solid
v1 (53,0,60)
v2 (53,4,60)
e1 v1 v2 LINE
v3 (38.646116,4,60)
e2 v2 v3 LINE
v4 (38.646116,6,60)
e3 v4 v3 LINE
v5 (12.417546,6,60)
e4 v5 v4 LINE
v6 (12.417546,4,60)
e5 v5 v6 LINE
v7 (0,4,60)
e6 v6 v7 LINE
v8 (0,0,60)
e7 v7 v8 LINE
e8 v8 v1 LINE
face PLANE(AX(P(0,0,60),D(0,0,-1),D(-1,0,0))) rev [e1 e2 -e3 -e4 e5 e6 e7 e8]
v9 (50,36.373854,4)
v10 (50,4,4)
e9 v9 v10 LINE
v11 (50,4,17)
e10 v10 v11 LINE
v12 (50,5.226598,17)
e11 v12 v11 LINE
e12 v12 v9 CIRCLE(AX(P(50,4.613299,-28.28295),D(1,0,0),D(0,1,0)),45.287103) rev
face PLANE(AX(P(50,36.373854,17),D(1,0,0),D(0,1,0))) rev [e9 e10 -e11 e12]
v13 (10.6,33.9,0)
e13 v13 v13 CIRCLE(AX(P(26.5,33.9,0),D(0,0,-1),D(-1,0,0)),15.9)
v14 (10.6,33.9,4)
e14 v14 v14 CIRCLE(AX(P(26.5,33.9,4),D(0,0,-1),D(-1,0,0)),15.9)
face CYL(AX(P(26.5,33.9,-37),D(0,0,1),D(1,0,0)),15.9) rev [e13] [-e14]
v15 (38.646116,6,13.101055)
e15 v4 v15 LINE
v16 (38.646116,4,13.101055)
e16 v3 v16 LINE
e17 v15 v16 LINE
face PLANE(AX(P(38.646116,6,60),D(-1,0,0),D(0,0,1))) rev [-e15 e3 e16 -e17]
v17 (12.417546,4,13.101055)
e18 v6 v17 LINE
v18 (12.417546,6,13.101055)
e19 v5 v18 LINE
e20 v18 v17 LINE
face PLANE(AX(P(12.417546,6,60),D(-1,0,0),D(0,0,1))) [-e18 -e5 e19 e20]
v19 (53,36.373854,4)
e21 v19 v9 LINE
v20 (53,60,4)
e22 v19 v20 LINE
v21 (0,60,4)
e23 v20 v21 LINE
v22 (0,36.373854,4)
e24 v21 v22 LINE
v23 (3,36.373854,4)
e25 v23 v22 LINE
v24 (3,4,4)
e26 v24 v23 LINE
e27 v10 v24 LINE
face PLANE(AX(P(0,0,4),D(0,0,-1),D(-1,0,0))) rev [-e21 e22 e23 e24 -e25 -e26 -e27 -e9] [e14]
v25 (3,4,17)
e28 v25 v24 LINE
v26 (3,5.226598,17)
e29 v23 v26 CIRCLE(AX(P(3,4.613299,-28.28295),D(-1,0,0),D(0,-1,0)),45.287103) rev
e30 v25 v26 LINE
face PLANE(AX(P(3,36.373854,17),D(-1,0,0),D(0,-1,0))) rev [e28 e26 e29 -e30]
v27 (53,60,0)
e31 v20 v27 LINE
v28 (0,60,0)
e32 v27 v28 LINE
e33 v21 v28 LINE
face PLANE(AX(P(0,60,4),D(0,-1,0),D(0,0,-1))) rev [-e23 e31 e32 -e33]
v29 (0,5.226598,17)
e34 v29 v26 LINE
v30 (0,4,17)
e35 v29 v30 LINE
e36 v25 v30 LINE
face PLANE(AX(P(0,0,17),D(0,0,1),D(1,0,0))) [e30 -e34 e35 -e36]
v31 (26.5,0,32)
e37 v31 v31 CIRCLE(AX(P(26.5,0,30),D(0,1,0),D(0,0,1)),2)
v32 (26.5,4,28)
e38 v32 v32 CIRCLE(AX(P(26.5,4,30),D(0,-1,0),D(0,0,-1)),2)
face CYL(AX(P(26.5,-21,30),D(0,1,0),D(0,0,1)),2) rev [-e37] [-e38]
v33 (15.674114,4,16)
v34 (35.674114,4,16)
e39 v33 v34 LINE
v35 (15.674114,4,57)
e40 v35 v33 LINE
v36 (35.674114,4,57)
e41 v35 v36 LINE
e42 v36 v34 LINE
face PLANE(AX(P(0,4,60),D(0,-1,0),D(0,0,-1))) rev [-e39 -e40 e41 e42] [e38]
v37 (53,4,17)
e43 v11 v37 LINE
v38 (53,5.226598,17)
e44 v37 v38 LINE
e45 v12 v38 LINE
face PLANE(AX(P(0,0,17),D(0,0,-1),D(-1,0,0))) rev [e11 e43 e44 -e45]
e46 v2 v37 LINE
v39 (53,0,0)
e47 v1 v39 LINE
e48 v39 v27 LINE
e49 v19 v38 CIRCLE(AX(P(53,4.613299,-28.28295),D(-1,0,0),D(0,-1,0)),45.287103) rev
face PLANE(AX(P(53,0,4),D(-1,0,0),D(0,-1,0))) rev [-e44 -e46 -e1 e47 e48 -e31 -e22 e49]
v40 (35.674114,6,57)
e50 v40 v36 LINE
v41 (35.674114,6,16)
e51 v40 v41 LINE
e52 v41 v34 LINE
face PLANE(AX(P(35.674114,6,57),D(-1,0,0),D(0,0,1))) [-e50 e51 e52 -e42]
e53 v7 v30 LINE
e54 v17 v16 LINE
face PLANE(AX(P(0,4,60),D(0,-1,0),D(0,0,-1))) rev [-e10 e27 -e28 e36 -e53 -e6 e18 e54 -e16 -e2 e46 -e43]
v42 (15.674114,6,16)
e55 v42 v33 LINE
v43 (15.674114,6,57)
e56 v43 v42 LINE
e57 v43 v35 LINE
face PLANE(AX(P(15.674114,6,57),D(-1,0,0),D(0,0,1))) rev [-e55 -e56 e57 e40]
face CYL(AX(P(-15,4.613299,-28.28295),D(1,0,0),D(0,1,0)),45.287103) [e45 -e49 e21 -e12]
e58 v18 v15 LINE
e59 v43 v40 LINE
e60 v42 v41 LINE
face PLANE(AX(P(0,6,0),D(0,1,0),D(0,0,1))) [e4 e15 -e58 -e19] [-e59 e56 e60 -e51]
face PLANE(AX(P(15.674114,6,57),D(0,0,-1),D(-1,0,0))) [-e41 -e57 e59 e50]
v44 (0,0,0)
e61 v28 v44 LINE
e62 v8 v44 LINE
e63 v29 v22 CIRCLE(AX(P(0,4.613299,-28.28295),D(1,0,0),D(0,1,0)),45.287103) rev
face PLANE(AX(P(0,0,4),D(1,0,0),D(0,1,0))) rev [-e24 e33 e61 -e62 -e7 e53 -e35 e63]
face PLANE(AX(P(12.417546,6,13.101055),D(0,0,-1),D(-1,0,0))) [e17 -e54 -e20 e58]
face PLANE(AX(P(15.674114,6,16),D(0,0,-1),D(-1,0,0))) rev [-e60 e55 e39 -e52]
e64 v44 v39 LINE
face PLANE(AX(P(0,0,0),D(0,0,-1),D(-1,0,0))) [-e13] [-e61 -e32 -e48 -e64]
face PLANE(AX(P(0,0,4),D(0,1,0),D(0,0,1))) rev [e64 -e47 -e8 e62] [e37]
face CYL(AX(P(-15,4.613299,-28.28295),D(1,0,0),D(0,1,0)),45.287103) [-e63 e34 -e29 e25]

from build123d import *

# Parameters (mm, degrees)
ESBO_O1_W                  = 53
ESBO_O1_H                  = 60
RESSALTO_EXTRUS_O1_DEPTH   = 4
ESBO_O2_W                  = 53
ESBO_O2_H                  = 4
RESSALTO_EXTRUS_O2_DEPTH   = 60
ESBO_O5_W                  = 3
ESBO_O5_H                  = 36.373853852
RESSALTO_EXTRUS_O3_DEPTH   = 17
CORTE_EXTRUS_O3_DEPTH      = 62
CORTE_EXTRUS_O3_DEPTH_BACK = 15
ESBO_O7_W                  = 26.228570329
ESBO_O7_H                  = 46.898944641
ESBO_O7_W_2                = 20
ESBO_O7_H_2                = 41
RESSALTO_EXTRUS_O4_DEPTH   = 6
CORTE_EXTRUS_O4_DEPTH      = 10
CORTE_EXTRUS_O4_DEPTH_BACK = 21
ESBO_O8_R                  = 2
CORTE_EXTRUS_O6_DEPTH      = 45
CORTE_EXTRUS_O6_DEPTH_BACK = 37
ESBO_O9_R                  = 15.9


with BuildPart() as part:
    # Esboço1 → Ressalto-extrusão1 (new body)
    with BuildSketch(Plane.XY):
        with Locations((26.5, 30)):
            Rectangle(ESBO_O1_W, ESBO_O1_H)
    extrude(amount=RESSALTO_EXTRUS_O1_DEPTH)

    # Esboço2 → Ressalto-extrusão2 (add)
    with BuildSketch(Plane.XY):
        with Locations((26.5, 2)):
            Rectangle(ESBO_O2_W, ESBO_O2_H)
    extrude(amount=RESSALTO_EXTRUS_O2_DEPTH)

    # Esboço5 → Ressalto-extrusão3 (add)
    with BuildSketch(Plane.XY):
        with Locations((1.5, 18.186926926)):
            Rectangle(ESBO_O5_W, ESBO_O5_H)
        with Locations((51.5, 18.186926926)):
            Rectangle(ESBO_O5_W, ESBO_O5_H)
    extrude(amount=RESSALTO_EXTRUS_O3_DEPTH)

    # Esboço6 → Corte-extrusão3 (cut, two sides: drawn at the far end of the back side and taken through both)
    with BuildSketch(Plane(origin=(0, 0, 0), x_dir=(0, 0, -1), z_dir=(1, 0, 0)).offset(-CORTE_EXTRUS_O3_DEPTH_BACK)):
        with BuildLine():
            ThreePointArc((-17, 5.226597996), (-13.510052949, 22.056538471), (-4, 36.373853852))
            Line((-4, 36.373853852), (-17, 36.373853852))
            Line((-17, 36.373853852), (-17, 5.226597996))
        make_face()
    extrude(amount=CORTE_EXTRUS_O3_DEPTH + CORTE_EXTRUS_O3_DEPTH_BACK, mode=Mode.SUBTRACT)

    # Esboço7 → Ressalto-extrusão4 (add)
    with BuildSketch(Plane(origin=(0, 0, 0), x_dir=(1, 0, 0), z_dir=(0, 1, 0))):
        with Locations((25.531831297, -36.55052768)):
            Rectangle(ESBO_O7_W, ESBO_O7_H)
        with Locations((25.674113589, -36.5)):
            Rectangle(ESBO_O7_W_2, ESBO_O7_H_2, mode=Mode.SUBTRACT)
    extrude(amount=RESSALTO_EXTRUS_O4_DEPTH)

    # Esboço8 → Corte-extrusão4 (cut, two sides: drawn at the far end of the back side and taken through both)
    with BuildSketch(Plane(origin=(0, 0, 0), x_dir=(1, 0, 0), z_dir=(0, 1, 0)).offset(-CORTE_EXTRUS_O4_DEPTH_BACK)):
        with Locations((26.5, -30)):
            Circle(ESBO_O8_R)
    extrude(amount=CORTE_EXTRUS_O4_DEPTH + CORTE_EXTRUS_O4_DEPTH_BACK, mode=Mode.SUBTRACT)

    # Esboço9 → Corte-extrusão6 (cut, two sides: drawn at the far end of the back side and taken through both)
    with BuildSketch(Plane.XY.offset(-CORTE_EXTRUS_O6_DEPTH_BACK)):
        with Locations((26.5, 33.9)):
            Circle(ESBO_O9_R)
    extrude(amount=CORTE_EXTRUS_O6_DEPTH + CORTE_EXTRUS_O6_DEPTH_BACK, mode=Mode.SUBTRACT)


solid = part.part
